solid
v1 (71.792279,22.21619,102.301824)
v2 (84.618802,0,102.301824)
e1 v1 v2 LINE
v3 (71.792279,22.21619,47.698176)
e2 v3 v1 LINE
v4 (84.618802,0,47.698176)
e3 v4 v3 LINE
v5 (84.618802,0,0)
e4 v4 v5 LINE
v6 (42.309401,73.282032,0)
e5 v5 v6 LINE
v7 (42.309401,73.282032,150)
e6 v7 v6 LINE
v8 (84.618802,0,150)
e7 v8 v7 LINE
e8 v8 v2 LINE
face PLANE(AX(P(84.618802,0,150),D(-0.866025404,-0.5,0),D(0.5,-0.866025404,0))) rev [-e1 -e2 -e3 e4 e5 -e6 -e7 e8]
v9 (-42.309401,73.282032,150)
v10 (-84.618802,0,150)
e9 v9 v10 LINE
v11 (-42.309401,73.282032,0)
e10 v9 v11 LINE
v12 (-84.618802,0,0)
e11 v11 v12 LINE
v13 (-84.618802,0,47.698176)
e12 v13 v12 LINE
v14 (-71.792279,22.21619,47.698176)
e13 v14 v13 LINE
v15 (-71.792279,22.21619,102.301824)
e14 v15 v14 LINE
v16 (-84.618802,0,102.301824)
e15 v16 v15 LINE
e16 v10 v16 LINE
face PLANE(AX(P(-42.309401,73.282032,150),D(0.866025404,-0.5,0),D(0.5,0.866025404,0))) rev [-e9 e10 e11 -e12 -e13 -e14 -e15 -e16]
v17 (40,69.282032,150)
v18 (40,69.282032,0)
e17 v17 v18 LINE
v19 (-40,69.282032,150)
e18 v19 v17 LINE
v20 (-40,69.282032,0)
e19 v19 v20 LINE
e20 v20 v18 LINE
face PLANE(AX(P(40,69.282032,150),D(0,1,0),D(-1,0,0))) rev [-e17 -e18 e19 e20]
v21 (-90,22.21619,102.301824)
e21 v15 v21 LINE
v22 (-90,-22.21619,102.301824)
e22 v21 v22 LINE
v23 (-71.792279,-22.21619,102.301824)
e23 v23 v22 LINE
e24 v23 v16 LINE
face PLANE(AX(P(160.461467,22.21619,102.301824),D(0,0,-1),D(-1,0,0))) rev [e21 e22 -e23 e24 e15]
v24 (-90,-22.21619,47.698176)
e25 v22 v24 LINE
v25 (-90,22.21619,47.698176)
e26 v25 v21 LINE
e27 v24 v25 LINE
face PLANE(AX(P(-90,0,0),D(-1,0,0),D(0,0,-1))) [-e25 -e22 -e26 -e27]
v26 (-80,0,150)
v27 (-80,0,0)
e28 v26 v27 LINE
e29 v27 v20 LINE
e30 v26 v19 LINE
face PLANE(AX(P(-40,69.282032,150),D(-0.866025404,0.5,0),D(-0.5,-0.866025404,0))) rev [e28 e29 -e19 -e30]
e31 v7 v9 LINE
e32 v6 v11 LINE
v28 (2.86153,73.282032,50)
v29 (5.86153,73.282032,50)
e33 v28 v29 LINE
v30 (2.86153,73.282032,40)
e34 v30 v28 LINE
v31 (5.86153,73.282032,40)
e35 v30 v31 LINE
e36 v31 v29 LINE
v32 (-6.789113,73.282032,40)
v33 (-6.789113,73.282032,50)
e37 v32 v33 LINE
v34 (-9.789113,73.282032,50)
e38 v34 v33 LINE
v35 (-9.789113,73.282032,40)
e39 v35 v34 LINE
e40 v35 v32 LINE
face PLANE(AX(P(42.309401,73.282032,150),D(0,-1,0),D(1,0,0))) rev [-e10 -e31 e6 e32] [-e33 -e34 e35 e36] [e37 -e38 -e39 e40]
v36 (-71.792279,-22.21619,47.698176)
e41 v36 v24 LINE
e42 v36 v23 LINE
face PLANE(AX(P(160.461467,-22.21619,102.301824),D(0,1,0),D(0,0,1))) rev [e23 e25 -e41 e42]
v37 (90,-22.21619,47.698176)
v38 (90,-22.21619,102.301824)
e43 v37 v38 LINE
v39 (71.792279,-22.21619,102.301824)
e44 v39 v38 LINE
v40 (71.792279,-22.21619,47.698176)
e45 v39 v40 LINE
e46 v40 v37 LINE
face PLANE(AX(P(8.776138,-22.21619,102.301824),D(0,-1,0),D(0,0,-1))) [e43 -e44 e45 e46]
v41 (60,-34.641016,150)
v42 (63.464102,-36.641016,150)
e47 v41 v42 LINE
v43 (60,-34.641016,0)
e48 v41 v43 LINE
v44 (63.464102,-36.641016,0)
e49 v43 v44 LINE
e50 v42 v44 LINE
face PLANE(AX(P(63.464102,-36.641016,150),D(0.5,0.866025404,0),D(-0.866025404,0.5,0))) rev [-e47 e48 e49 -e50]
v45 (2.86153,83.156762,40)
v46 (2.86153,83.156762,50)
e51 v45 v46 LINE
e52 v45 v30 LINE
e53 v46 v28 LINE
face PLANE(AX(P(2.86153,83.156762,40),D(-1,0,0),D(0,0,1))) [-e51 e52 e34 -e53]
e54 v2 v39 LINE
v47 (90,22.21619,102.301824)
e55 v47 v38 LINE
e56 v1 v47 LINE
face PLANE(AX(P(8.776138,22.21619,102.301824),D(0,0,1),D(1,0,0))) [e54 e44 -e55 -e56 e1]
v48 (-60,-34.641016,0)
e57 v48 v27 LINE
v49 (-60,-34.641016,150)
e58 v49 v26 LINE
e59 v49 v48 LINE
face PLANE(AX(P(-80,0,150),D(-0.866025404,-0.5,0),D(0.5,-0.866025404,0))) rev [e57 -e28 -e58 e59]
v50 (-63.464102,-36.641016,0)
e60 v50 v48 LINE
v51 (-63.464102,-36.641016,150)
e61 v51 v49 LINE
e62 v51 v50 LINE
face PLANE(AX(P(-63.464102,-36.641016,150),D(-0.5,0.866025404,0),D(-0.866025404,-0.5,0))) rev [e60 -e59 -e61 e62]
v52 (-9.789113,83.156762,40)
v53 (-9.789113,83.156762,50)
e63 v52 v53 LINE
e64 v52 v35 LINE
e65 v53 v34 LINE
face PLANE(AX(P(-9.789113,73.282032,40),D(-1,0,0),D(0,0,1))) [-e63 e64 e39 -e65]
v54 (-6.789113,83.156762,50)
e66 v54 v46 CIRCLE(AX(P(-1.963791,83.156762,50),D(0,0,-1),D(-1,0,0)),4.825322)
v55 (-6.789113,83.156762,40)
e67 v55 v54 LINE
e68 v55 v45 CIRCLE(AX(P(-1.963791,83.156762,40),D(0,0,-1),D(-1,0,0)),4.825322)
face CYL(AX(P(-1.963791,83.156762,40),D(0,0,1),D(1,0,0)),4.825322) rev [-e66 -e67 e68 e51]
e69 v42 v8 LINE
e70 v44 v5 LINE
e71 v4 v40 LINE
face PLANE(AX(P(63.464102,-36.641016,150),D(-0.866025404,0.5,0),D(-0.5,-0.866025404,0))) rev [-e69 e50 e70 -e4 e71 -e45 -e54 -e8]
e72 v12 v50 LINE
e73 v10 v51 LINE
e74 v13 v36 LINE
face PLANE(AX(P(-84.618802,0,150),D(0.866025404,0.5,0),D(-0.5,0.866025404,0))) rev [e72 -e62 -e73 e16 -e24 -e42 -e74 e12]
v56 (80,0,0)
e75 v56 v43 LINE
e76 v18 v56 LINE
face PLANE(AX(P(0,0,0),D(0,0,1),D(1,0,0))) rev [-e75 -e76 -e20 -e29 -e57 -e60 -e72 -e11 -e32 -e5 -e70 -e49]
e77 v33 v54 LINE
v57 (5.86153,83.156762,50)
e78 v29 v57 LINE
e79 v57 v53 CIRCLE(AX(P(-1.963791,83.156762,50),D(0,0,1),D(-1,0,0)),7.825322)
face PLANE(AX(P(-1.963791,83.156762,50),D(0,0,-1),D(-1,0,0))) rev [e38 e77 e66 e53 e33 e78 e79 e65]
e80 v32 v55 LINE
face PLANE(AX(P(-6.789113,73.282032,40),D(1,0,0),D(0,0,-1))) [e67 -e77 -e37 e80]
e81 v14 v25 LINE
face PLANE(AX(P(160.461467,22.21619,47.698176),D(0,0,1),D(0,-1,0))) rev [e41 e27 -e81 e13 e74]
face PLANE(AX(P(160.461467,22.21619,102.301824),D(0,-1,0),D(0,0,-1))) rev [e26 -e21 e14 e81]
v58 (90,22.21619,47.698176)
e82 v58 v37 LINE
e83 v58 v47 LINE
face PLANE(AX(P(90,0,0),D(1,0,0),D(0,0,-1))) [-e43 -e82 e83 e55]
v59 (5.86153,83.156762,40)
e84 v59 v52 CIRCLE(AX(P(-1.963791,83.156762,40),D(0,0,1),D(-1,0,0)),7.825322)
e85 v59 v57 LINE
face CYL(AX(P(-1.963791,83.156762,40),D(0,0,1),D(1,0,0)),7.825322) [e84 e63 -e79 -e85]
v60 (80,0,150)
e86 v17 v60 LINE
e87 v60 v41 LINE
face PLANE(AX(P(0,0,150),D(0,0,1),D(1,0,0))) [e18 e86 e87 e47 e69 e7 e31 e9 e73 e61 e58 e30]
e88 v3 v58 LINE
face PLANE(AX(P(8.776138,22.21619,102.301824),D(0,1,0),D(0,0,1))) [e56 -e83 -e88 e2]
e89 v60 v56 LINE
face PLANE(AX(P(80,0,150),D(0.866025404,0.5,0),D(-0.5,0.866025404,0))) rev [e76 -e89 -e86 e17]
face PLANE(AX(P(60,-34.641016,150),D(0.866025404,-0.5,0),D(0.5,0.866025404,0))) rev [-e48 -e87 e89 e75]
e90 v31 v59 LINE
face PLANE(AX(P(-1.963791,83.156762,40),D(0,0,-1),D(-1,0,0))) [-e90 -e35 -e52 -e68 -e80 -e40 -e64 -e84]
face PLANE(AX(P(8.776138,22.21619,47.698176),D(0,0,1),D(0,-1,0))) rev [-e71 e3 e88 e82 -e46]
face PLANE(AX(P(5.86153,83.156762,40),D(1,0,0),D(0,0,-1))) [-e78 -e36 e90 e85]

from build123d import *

# Parameters (mm, degrees)
BOSS_EXTRUDE1_DEPTH = 150
BOSS_EXTRUDE2_REACH = 243.582
SKETCH2_W           = 54.603647952
SKETCH2_H           = 44.432380196
BOSS_EXTRUDE3_REACH = 243.582
SKETCH2_3_W         = 54.603647952
SKETCH2_3_H         = 44.432380196
MIRROR1_START       = 47.698176024
MIRROR1_DEPTH       = 54.603647952
CUT_EXTRUDE1_DEPTH  = 194.302477267
CUT_EXTRUDE2_DEPTH  = 54.603647952
BOSS_EXTRUDE4_START = -100
BOSS_EXTRUDE4_DEPTH = 10


# Read off the part's stored shape, not the designer's step: Mirror1
with BuildPart() as part:
    # Sketch1 → Boss-Extrude1 (new body)
    with BuildSketch(Plane.XY):
        Polygon((-42.309401077, 73.282032303), (-84.618802154, 0), (-63.464101615, -36.641016151), (-60, -34.641016151), (-80, 0), (-40, 69.282032303), (40, 69.282032303), (80, 0), (60, -34.641016151), (63.464101615, -36.641016151), (84.618802154, 0), (42.309401077, 73.282032303), align=None)
    extrude(amount=BOSS_EXTRUDE1_DEPTH)

    # Boss-Extrude2: up to this face of the body (flat: up to its plane)
    boss_extrude2_end = Plane(part.part.faces().sort_by_distance((74.041451884, -18.320508076, 75))[0])
    # Sketch2 → Boss-Extrude2 (add, up to the picked face)
    with BuildSketch(Plane(origin=(90, 0, 0), x_dir=(0, 0, -1), z_dir=(1, 0, 0)), mode=Mode.PRIVATE) as boss_extrude2_sk1:
        with Locations((-75, 0)):
            Rectangle(SKETCH2_W, SKETCH2_H)
    boss_extrude2_tool1 = split(extrude(boss_extrude2_sk1.sketch, amount=-BOSS_EXTRUDE2_REACH, mode=Mode.PRIVATE), bisect_by=boss_extrude2_end, keep=Keep.BOTH, mode=Mode.PRIVATE)
    add(boss_extrude2_tool1.solids().sort_by(Axis((90, 0, 75), (-1, 0, 0)))[0])

    # Boss-Extrude3: up to this face of the body (flat: up to its plane)
    boss_extrude3_end = Plane(part.part.faces().sort_by_distance((63.464101615, 36.641016151, 75))[0])
    # Sketch2<3> → Boss-Extrude3 (add, up to the picked face)
    with BuildSketch(Plane(origin=(90, 0, 0), x_dir=(0, 0, -1), z_dir=(1, 0, 0)), mode=Mode.PRIVATE) as boss_extrude3_sk1:
        with Locations((-75, 0)):
            Rectangle(SKETCH2_3_W, SKETCH2_3_H)
    boss_extrude3_tool1 = split(extrude(boss_extrude3_sk1.sketch, amount=-BOSS_EXTRUDE3_REACH, mode=Mode.PRIVATE), bisect_by=boss_extrude3_end, keep=Keep.BOTH, mode=Mode.PRIVATE)
    add(boss_extrude3_tool1.solids().sort_by(Axis((90, 0, 75), (-1, 0, 0)))[0])

    # Mirror1 outline → Mirror1 (add)
    with BuildSketch(Plane.XY.offset(MIRROR1_START)):
        Polygon((97.445325487, -22.216190098), (90, -9.320508076), (90, -22.216190098), align=None)
        Polygon((-67.173476666, -22.216190098), (67.173476666, -22.216190098), (80, 0), (67.173476666, 22.216190098), (-67.173476666, 22.216190098), (-80, 0), align=None)
        Polygon((-90, -22.216190098), (-71.79227882, -22.216190098), (-84.618802154, 0), (-71.79227882, 22.216190098), (-90, 22.216190098), align=None)
    extrude(amount=MIRROR1_DEPTH)

    # Sketch3 → Cut-Extrude1 (cut, through all)
    with BuildSketch(Plane.XY.offset(150)):
        Polygon((80, 0), (60, -34.641016151), (-60, -34.641016151), (-80, 0), (-40, 69.282032303), (40, 69.282032303), align=None)
    extrude(amount=-CUT_EXTRUDE1_DEPTH, mode=Mode.SUBTRACT)

    # Sketch4 → Cut-Extrude2 (cut)
    with BuildSketch(Plane.XY.offset(102.301823976)):
        Polygon((90, -9.320508076), (90, -22.216190098), (97.445325487, -22.216190098), align=None)
    extrude(amount=-CUT_EXTRUDE2_DEPTH, mode=Mode.SUBTRACT)

    # Sketch5 → Boss-Extrude4 (add)
    with BuildSketch(Plane.XY.offset(150).offset(BOSS_EXTRUDE4_START)):
        with BuildLine():
            Line((-9.78911305, 73.282032303), (-9.78911305, 83.156762189))
            ThreePointArc((-9.78911305, 83.156762189), (-1.963791345, 90.982083893), (5.861530359, 83.156762189))
            Line((5.861530359, 83.156762189), (5.861530359, 73.282032303))
            Line((5.861530359, 73.282032303), (2.861530359, 73.282032303))
            Line((2.861530359, 73.282032303), (2.861530359, 83.156762189))
            ThreePointArc((2.861530359, 83.156762189), (-1.963791345, 87.982083893), (-6.78911305, 83.156762189))
            Line((-6.78911305, 83.156762189), (-6.78911305, 73.282032303))
            Line((-6.78911305, 73.282032303), (-9.78911305, 73.282032303))
        make_face()
    extrude(amount=-BOSS_EXTRUDE4_DEPTH)


solid = part.part
